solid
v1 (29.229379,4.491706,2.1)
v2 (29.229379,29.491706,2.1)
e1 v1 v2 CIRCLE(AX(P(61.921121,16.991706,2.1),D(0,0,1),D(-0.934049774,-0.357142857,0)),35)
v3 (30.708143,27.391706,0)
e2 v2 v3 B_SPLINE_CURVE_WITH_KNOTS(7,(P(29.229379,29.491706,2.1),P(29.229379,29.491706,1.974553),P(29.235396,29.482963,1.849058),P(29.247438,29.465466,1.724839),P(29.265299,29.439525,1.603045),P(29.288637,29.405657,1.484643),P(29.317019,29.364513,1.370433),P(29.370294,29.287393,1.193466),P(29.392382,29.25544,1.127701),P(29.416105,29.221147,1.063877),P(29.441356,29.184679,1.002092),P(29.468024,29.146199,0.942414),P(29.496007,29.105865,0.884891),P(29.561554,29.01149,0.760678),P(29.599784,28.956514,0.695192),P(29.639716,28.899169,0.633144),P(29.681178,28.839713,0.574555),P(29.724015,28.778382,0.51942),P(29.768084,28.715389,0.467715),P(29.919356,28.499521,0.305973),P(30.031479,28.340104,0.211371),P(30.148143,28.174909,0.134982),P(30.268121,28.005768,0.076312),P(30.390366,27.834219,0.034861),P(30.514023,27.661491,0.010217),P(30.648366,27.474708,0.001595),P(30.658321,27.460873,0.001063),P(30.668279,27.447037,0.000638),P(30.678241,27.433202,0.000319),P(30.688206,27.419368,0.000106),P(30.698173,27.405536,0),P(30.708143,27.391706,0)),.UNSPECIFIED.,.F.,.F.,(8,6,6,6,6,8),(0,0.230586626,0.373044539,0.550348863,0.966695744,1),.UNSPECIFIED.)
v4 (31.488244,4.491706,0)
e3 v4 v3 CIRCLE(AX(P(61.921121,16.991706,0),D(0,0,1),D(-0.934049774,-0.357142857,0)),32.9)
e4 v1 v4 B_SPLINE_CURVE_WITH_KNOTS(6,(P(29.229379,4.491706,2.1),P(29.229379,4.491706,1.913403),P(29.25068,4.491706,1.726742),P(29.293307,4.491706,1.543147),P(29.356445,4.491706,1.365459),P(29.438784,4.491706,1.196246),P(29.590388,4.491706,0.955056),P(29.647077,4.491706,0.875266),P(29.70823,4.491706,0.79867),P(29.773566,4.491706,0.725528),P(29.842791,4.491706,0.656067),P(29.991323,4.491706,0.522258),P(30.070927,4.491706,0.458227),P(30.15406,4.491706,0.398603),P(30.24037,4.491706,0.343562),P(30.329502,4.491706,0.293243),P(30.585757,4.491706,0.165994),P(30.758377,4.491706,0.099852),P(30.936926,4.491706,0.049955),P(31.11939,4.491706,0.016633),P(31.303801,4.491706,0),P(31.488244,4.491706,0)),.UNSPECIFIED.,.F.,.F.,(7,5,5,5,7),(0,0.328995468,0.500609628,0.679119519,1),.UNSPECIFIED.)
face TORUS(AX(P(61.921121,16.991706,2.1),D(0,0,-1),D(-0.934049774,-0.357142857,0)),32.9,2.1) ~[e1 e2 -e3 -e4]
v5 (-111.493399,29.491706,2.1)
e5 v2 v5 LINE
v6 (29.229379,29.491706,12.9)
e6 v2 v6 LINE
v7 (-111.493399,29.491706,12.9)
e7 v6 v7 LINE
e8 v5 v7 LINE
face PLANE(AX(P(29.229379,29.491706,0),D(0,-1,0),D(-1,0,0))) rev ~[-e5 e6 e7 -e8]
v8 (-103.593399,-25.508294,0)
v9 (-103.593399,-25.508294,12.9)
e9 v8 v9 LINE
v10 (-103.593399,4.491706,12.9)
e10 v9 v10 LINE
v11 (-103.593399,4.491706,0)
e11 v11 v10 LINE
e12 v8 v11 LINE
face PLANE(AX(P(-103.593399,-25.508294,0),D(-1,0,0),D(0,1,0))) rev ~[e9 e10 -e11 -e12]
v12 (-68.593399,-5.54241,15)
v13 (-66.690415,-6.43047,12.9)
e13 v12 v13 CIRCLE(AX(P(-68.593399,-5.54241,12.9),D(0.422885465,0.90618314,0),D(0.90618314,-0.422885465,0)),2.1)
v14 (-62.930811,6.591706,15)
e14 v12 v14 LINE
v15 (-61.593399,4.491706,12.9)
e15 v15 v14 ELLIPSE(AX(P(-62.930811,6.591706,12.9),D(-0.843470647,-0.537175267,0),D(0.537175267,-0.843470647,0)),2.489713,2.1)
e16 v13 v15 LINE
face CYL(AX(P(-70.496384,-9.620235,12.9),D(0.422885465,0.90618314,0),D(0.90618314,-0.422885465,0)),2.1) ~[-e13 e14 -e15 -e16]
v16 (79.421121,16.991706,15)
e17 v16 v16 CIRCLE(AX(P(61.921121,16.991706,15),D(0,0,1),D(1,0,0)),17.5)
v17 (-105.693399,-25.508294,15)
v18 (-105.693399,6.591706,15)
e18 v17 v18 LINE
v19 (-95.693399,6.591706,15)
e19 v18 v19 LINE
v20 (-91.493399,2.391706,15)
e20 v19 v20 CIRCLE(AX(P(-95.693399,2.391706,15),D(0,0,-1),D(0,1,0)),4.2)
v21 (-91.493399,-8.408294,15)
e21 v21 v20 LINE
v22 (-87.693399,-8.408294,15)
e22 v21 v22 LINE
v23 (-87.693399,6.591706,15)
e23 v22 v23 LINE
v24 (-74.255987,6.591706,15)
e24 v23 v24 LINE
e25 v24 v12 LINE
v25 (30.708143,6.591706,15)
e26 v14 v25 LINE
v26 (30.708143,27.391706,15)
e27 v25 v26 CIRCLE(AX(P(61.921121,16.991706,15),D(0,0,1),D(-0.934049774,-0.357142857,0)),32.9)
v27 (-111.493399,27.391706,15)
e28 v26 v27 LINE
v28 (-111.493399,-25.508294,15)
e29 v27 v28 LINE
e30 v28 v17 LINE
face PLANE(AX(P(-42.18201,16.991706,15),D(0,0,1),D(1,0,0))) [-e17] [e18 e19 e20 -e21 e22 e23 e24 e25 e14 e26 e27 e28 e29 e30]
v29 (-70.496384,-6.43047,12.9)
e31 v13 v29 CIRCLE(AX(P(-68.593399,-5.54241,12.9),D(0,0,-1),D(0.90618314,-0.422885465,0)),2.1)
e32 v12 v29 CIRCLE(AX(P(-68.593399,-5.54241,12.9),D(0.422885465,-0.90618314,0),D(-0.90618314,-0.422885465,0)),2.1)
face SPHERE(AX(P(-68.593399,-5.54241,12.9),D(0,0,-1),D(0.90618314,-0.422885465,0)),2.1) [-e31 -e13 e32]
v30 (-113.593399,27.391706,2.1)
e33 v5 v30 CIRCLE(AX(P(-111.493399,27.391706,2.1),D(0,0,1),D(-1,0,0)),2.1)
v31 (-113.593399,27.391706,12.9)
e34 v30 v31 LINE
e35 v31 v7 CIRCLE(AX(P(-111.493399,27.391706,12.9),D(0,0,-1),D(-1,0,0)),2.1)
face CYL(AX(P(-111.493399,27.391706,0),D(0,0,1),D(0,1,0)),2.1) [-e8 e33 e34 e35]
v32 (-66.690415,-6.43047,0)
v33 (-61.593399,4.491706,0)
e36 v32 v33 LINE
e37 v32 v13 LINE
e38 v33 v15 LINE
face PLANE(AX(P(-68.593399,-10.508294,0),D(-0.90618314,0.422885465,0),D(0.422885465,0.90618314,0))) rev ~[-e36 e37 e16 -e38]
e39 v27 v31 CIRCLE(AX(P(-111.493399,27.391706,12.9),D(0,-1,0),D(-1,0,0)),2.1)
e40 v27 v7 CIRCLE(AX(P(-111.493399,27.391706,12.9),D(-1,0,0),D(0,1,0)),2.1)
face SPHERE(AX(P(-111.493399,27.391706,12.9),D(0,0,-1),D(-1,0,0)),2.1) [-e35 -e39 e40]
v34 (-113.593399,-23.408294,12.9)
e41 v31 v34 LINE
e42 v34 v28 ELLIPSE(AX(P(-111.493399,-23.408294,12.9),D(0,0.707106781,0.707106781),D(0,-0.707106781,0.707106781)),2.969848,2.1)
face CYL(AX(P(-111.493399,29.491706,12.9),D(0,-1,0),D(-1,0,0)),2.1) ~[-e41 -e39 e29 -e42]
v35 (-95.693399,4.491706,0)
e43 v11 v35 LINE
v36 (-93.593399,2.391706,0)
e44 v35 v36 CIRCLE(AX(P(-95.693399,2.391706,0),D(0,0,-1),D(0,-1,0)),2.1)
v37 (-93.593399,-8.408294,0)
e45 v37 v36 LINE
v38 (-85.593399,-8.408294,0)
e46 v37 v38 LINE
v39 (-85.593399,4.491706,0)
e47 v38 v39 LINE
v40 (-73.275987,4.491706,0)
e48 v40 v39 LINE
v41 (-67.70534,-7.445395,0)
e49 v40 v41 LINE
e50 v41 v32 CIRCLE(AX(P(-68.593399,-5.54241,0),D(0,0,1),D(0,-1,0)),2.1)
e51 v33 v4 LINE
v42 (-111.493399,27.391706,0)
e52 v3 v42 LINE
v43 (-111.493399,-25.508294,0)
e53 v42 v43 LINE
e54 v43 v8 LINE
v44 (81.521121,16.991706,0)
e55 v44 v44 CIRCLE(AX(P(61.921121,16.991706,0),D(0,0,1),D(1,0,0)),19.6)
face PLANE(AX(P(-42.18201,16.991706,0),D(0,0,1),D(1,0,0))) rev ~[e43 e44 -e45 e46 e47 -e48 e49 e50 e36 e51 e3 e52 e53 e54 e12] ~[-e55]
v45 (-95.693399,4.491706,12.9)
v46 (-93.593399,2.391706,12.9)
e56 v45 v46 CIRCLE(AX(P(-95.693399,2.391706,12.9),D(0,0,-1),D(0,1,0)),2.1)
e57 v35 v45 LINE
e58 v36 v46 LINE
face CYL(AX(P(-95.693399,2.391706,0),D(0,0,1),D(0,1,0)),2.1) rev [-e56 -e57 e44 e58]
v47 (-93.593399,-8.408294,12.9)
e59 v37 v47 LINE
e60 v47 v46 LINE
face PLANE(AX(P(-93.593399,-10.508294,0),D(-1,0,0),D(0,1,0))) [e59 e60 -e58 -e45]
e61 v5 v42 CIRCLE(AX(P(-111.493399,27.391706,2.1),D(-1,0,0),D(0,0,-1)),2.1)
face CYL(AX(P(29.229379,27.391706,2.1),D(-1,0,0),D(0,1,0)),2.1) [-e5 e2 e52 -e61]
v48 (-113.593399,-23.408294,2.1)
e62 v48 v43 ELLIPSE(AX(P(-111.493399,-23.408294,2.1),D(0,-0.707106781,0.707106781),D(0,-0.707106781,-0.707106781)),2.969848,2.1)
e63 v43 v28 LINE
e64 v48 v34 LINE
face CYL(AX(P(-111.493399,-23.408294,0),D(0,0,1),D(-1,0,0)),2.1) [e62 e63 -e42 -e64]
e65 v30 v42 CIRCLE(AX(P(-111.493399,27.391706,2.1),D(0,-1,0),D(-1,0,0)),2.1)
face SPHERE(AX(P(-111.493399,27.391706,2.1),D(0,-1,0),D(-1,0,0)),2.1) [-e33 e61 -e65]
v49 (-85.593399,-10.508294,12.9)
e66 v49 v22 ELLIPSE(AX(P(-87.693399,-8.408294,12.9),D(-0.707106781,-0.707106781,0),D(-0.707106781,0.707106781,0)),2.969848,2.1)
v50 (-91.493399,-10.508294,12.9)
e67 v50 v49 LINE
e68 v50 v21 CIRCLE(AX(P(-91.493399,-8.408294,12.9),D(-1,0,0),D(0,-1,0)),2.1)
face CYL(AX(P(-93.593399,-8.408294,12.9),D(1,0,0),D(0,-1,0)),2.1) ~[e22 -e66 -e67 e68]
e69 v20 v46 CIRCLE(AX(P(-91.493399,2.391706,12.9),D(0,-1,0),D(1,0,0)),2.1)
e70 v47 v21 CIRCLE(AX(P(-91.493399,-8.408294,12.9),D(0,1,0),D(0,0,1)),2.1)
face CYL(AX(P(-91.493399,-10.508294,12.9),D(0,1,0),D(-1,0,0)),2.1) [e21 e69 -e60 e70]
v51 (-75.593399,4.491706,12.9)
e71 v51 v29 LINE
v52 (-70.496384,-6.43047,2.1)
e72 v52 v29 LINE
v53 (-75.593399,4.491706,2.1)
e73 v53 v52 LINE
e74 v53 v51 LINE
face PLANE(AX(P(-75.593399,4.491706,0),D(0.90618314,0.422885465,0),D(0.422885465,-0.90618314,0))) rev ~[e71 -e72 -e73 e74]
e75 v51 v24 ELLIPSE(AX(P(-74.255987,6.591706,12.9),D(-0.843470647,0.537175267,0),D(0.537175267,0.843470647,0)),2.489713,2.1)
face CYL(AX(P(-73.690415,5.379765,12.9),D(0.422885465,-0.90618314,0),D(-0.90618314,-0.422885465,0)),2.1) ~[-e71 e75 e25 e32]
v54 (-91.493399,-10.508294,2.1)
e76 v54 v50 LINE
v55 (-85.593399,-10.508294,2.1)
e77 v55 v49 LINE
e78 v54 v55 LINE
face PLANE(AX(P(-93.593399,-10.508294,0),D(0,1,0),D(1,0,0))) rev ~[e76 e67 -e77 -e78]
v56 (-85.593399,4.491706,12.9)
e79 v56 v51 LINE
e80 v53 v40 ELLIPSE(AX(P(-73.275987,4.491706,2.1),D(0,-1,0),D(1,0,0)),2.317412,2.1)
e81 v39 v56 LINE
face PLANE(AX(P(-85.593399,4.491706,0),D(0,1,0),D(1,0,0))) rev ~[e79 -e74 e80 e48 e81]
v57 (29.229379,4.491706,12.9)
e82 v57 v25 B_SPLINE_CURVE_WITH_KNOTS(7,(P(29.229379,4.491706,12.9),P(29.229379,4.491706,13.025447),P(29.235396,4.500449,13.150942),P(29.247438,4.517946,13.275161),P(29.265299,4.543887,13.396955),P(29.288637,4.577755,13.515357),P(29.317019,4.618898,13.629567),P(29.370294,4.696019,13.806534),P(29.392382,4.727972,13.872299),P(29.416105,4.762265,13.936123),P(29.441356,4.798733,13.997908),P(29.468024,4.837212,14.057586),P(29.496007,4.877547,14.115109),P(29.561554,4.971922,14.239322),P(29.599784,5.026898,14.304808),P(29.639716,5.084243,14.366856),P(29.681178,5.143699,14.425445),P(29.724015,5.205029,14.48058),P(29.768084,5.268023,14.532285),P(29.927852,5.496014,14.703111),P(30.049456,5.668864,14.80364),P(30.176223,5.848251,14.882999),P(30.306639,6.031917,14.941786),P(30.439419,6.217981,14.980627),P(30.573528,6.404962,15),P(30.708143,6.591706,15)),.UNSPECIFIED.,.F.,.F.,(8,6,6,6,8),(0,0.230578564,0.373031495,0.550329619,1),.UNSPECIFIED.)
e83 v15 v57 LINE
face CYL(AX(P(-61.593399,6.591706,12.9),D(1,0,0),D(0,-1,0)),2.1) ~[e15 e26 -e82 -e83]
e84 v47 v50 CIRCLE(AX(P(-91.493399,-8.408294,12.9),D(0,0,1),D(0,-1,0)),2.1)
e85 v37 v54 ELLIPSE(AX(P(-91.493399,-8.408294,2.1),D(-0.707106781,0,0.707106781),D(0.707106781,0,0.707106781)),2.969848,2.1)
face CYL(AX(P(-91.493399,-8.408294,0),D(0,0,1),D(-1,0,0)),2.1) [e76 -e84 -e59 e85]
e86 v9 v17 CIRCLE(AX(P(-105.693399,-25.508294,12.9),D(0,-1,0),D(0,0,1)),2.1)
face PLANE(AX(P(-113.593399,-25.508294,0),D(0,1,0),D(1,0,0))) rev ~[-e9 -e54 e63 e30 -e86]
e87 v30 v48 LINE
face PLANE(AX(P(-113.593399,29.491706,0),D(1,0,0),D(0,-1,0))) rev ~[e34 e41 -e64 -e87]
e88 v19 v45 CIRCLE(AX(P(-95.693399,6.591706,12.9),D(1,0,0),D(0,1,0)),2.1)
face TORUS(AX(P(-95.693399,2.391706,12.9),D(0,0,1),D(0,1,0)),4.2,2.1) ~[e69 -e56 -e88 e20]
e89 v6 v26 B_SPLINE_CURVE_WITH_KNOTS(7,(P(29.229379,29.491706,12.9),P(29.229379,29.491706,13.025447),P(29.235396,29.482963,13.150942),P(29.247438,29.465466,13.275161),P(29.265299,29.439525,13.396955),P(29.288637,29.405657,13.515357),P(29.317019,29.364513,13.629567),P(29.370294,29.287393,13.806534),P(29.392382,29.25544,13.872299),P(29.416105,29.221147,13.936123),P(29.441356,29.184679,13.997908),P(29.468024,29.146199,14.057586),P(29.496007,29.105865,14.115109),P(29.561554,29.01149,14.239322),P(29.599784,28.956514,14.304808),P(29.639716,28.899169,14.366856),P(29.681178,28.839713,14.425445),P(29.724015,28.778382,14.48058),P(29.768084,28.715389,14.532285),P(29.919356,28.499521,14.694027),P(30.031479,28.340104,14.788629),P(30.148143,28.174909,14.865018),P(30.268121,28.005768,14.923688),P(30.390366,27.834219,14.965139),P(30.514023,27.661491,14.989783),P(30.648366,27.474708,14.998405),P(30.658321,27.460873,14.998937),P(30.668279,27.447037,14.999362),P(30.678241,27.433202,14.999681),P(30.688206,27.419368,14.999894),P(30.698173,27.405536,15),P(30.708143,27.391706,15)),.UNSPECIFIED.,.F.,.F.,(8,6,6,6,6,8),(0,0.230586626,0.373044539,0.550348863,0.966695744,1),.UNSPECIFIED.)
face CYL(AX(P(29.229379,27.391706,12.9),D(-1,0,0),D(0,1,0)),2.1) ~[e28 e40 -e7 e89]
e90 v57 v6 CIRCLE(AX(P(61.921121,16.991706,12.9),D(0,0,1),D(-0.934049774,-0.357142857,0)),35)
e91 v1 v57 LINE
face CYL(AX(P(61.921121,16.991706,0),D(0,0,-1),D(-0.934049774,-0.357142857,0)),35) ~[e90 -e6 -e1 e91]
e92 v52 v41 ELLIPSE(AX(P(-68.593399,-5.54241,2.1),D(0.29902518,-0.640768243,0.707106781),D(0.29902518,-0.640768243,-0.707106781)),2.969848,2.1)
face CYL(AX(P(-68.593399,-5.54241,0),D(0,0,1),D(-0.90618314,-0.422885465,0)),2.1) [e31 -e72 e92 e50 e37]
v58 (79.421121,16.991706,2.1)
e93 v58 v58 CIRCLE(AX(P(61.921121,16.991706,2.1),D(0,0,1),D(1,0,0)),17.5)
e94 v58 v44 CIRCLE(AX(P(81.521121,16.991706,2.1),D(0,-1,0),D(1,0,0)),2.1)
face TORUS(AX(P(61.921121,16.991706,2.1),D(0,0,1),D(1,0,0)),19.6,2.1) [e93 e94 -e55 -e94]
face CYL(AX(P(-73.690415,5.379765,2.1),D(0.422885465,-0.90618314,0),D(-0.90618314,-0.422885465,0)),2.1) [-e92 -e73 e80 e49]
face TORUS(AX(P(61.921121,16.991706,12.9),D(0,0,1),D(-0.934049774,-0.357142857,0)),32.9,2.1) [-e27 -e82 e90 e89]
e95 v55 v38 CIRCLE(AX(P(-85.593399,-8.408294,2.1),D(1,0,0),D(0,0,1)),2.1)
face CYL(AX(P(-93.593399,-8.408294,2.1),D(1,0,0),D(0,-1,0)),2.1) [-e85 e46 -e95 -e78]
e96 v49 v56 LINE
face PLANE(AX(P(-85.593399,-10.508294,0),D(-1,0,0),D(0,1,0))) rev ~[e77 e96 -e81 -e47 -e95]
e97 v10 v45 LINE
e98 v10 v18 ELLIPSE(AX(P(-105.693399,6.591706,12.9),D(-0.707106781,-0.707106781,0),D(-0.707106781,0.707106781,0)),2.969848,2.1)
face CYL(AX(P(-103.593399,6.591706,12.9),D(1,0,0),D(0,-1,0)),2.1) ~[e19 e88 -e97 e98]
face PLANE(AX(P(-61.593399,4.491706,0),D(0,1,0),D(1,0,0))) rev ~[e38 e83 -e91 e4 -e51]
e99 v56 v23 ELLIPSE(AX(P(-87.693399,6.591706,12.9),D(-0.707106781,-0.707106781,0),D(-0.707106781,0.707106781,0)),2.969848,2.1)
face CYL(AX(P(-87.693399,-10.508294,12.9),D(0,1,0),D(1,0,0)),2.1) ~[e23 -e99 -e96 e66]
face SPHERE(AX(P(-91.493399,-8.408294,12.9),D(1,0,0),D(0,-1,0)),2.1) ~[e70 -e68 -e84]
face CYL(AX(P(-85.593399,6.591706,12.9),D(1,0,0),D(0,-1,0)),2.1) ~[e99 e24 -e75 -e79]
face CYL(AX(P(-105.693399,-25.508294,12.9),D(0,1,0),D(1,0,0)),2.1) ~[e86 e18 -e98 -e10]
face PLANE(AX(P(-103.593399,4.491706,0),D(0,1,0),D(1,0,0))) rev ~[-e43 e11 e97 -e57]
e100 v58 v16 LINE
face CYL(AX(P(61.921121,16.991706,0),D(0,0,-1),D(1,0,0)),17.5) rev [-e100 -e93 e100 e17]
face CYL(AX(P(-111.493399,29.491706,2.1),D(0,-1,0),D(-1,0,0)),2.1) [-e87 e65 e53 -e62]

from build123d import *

# Parameters (mm, degrees)
F0_R     = 17.5
F0_W     = 10
F0_H     = 30
F0_W_2   = 8
F0_H_2   = 15
F1_DEPTH = 15
F2_R     = 2.1


with BuildPart() as f1:
    # F0 (on Top) → F1 (new body)
    with BuildSketch(Plane.XY):
        Polygon((29.2293787445, 29.4917059159), (-113.5933991075, 29.4917059159), (-113.5933991075, 4.4917059159), (-103.5933991075, 4.4917059159), (-93.5933991075, 4.4917059159), (-85.5933991075, 4.4917059159), (-75.5933991075, 4.4917059159), (-61.5933991075, 4.4917059159), (29.2293787445, 4.4917059159), align=None)
        with BuildLine():
            ThreePointArc((29.2293787445, 4.4917059159), (96.9211208211, 16.9917059159), (29.2293787445, 29.4917059159))
            Line((29.2293787445, 29.4917059159), (29.2293787445, 4.4917059159))
        make_face()
        with Locations((61.9211208211, 16.9917059159)):
            Circle(F0_R, mode=Mode.SUBTRACT)
        with Locations((-108.5933991075, -10.5082940841)):
            Rectangle(F0_W, F0_H)
        Polygon((-68.5933991075, -10.5082940841), (-61.5933991075, 4.4917059159), (-75.5933991075, 4.4917059159), align=None)
        with Locations((-89.5933991075, -3.0082940841)):
            Rectangle(F0_W_2, F0_H_2)
    extrude(amount=F1_DEPTH)

    # F2
    f2_edges = [f1.edges().sort_by_distance(p)[0] for p in [
        (-113.593399, 1.991706, 0),
        (-113.593399, 29.491706, 7.5),
        (-113.593399, 1.991706, 15),
        (-113.593399, -25.508294, 7.5),
        (-42.18201, 29.491706, 0),
        (-16.18201, 4.491706, 15),
        (-42.18201, 29.491706, 15),
        (96.921121, 16.991706, 15),
        (96.921121, 16.991706, 0),
        (-65.093399, -3.008294, 15),
        (-85.593399, -3.008294, 15),
        (-80.593399, 4.491706, 15),
        (-72.093399, -3.008294, 15),
        (-89.593399, -10.508294, 15),
        (-93.593399, 4.491706, 7.5),
        (-103.593399, -10.508294, 15),
        (-93.593399, -10.508294, 7.5),
        (-89.593399, -10.508294, 0),
        (-72.093399, -3.008294, 0),
        (-68.593399, -10.508294, 7.5),
        (-98.593399, 4.491706, 15),
        (44.421121, 16.991706, 0),
        (-93.593399, -3.008294, 15),
    ]]
    fillet(f2_edges, radius=F2_R)


solid = f1.part
